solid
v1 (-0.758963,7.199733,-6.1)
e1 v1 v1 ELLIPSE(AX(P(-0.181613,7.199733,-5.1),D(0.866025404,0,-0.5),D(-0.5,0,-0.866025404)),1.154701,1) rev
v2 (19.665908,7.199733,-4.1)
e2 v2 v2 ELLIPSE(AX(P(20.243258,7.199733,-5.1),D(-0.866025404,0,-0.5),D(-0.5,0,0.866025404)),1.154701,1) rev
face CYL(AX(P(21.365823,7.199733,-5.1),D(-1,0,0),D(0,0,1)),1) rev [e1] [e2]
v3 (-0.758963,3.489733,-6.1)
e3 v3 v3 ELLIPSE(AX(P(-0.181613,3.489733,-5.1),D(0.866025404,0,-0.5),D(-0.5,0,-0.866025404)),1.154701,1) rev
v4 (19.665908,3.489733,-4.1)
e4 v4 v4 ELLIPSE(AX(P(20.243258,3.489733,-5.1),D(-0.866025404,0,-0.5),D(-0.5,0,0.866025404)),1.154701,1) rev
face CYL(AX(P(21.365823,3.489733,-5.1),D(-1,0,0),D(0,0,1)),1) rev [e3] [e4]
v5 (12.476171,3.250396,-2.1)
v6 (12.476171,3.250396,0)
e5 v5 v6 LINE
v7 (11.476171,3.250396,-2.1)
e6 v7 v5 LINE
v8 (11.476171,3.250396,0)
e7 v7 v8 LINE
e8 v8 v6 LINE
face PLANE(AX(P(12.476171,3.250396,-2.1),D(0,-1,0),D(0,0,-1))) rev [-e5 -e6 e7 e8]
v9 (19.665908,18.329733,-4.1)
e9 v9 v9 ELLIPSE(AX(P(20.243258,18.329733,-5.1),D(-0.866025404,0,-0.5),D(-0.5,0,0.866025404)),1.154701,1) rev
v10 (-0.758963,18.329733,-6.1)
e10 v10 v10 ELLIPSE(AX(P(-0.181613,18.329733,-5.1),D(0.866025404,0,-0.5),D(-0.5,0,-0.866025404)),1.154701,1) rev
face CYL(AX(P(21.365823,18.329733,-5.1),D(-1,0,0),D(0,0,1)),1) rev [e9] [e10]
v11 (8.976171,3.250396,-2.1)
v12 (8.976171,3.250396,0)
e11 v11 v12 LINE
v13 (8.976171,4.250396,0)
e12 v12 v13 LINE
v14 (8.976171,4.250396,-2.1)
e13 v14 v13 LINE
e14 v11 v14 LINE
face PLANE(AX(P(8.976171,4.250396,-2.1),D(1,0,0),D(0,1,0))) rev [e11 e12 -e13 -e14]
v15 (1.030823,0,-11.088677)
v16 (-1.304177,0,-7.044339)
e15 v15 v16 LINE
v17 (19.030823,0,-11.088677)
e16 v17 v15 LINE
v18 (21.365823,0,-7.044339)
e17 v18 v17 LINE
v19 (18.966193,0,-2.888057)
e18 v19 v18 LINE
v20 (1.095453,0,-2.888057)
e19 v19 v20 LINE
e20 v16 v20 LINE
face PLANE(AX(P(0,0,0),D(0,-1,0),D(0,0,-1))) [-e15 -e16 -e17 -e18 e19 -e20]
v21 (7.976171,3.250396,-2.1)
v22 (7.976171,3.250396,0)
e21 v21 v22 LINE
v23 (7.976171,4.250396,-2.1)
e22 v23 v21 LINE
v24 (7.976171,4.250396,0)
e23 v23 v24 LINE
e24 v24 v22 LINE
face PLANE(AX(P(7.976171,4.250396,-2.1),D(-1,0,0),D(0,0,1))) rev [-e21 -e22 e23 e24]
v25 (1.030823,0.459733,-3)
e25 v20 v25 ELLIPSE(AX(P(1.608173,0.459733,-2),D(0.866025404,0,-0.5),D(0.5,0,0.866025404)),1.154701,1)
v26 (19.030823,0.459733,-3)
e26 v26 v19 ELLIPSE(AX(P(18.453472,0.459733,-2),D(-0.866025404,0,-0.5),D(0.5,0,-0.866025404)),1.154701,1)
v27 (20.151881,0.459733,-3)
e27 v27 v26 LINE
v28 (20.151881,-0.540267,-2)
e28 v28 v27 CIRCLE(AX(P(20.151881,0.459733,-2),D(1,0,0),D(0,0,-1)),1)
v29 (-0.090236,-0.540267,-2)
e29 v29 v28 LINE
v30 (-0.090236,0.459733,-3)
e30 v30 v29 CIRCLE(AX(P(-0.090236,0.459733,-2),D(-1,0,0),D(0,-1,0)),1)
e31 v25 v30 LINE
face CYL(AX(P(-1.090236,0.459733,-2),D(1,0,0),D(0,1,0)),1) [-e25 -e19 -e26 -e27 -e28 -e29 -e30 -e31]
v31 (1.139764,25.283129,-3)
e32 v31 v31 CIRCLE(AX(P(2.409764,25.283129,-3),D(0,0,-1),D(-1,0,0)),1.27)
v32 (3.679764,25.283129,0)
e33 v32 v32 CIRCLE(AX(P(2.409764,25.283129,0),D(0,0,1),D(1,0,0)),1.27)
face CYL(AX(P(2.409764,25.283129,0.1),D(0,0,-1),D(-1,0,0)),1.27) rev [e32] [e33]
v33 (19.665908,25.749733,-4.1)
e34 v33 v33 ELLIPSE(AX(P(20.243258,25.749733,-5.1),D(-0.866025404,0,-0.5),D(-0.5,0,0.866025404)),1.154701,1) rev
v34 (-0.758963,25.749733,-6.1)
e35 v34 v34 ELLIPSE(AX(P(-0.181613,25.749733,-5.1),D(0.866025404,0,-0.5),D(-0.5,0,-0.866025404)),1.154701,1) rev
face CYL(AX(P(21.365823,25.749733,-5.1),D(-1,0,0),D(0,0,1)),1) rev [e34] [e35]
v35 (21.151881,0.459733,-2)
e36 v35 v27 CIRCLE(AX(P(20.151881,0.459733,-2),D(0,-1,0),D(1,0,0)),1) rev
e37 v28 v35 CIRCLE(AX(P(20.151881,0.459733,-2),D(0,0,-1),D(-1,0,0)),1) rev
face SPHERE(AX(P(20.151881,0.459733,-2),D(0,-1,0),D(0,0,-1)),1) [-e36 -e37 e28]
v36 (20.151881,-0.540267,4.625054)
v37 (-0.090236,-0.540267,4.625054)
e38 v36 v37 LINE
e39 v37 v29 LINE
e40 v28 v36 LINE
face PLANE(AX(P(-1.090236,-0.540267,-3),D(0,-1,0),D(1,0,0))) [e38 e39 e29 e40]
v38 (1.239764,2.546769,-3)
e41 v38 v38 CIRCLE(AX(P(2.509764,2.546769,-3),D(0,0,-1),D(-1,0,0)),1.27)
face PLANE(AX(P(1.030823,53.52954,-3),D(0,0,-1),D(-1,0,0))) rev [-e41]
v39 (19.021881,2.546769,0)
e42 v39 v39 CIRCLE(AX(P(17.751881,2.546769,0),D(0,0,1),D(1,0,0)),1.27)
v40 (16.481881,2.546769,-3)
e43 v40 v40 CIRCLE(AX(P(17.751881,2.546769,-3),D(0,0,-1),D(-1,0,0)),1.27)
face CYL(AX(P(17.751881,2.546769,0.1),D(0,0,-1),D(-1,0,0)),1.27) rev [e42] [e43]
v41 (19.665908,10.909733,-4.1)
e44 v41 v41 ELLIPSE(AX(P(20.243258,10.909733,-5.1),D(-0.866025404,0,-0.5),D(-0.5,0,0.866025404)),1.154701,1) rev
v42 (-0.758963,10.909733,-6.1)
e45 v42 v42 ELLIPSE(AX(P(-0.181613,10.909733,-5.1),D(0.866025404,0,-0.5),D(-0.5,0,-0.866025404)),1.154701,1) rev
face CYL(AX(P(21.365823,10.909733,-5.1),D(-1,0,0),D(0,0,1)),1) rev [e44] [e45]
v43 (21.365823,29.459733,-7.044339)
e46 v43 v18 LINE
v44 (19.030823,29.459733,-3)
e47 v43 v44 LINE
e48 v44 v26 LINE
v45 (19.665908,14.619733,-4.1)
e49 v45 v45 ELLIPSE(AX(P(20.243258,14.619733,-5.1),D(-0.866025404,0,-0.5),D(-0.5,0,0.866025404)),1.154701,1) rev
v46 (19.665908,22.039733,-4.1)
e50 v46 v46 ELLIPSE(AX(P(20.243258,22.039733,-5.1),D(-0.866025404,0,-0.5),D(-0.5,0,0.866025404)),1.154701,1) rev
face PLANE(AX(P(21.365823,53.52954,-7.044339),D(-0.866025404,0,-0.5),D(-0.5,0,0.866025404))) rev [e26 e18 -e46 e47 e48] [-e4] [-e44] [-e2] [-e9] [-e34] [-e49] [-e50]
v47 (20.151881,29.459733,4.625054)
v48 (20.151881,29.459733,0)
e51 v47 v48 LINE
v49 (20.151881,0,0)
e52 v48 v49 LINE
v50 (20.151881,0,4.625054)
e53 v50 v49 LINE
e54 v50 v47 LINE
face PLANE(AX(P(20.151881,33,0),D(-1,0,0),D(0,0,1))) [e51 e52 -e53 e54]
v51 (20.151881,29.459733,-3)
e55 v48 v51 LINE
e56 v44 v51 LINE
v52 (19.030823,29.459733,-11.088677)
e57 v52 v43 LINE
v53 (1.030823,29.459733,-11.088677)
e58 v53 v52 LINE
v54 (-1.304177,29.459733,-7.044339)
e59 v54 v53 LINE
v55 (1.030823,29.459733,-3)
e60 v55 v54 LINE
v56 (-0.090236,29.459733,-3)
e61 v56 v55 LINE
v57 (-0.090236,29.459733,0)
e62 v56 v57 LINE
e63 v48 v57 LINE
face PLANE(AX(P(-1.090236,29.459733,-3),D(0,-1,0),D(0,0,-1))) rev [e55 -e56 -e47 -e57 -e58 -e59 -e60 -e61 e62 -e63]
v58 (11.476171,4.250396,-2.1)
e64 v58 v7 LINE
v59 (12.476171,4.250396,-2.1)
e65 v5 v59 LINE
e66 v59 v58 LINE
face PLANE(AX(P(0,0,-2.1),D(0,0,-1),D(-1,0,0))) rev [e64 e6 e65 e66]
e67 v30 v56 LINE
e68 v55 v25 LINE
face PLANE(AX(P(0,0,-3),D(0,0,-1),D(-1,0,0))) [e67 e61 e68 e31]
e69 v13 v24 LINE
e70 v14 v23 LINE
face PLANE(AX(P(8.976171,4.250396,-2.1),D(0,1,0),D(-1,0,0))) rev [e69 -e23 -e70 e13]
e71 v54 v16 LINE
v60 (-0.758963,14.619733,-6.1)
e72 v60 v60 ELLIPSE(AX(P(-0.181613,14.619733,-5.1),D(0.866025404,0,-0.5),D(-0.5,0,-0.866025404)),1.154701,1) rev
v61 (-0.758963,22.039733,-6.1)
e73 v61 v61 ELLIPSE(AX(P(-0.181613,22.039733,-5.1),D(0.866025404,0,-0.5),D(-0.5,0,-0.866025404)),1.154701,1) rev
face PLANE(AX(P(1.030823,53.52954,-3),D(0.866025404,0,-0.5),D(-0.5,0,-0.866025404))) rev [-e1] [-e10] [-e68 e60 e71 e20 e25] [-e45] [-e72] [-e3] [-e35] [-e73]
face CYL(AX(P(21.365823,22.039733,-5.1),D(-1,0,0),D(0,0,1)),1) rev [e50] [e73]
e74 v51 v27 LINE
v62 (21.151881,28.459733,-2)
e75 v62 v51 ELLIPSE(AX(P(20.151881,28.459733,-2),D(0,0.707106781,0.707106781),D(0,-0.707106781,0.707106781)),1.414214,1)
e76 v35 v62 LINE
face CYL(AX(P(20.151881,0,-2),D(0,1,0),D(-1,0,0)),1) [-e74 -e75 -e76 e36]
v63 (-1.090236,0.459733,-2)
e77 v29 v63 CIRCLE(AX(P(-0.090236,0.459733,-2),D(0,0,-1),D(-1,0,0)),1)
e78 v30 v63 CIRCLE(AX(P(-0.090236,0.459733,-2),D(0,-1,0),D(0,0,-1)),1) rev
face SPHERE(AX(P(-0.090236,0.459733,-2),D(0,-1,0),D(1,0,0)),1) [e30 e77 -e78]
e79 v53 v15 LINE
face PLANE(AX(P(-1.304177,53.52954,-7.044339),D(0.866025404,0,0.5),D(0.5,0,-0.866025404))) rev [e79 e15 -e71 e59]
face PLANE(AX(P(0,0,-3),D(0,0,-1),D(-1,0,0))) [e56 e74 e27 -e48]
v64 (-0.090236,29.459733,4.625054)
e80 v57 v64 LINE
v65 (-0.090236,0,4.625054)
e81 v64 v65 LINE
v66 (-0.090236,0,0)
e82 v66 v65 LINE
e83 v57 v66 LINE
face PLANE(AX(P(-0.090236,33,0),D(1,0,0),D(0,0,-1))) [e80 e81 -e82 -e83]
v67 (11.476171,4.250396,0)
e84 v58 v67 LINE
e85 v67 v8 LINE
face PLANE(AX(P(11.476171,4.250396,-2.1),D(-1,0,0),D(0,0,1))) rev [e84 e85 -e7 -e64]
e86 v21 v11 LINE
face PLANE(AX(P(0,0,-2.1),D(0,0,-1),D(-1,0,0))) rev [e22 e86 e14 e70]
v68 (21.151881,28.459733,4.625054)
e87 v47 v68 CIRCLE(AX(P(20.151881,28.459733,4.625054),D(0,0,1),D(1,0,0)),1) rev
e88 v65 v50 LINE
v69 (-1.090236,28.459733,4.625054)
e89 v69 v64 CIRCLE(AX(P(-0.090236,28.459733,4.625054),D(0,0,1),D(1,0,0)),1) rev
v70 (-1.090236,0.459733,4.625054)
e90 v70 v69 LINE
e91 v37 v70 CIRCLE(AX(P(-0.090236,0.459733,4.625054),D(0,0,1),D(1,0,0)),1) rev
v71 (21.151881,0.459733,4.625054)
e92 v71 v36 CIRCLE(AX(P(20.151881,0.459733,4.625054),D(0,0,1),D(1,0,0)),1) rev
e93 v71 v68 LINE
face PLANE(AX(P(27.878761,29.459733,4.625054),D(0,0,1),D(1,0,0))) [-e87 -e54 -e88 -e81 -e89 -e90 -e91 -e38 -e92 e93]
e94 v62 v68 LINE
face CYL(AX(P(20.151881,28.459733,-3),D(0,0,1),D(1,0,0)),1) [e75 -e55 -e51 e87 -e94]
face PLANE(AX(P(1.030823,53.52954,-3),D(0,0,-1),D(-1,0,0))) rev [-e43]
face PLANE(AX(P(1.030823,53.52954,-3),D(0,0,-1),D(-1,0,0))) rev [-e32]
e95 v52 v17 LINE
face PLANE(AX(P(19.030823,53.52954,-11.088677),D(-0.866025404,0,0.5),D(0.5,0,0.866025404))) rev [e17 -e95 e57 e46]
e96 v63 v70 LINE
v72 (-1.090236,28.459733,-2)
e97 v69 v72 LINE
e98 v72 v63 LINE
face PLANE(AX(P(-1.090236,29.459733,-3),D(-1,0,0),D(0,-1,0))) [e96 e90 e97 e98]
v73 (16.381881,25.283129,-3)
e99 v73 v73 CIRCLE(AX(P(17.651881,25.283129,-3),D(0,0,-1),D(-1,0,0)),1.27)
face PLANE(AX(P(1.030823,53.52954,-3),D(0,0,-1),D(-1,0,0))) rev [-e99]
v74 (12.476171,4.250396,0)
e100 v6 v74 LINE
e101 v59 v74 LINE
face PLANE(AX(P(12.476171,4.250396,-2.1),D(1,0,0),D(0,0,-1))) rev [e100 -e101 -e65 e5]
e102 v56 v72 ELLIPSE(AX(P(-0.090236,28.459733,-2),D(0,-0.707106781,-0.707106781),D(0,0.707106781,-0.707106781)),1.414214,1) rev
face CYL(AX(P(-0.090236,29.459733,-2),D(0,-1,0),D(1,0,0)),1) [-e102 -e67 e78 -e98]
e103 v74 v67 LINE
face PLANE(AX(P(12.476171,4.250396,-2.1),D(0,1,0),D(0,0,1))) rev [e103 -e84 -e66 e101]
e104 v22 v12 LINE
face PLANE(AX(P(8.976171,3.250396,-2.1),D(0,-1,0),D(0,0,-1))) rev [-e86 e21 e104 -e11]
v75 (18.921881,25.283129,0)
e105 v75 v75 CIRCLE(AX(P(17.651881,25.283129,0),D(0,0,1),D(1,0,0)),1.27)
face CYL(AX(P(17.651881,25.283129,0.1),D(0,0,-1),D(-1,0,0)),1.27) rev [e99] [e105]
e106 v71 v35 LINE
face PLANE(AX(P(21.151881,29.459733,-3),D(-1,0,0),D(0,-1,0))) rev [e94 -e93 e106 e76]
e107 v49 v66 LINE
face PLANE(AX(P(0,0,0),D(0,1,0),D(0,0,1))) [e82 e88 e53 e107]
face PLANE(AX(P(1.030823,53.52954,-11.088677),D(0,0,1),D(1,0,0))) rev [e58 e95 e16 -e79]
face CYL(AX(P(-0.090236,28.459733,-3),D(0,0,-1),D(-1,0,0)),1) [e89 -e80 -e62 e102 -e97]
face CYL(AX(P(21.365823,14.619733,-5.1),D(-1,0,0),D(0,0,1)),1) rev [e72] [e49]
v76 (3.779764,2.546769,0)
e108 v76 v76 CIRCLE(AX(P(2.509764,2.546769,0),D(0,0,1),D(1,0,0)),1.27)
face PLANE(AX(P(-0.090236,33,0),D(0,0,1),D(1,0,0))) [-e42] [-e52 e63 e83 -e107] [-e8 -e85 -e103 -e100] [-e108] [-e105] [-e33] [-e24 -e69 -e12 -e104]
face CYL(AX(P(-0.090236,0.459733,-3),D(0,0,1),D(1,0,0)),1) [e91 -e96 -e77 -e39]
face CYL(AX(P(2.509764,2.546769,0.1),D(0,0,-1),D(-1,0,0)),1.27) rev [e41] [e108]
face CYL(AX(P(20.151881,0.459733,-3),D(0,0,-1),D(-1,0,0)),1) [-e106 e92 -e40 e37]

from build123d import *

# Parameters (mm, degrees)
BOSS_EXTRUDE1_DEPTH      = 13
BOSS_EXTRUDE1_DEPTH_BACK = 3
SKETCH1_W                = 22.242116592
SKETCH1_H                = 30
SKETCH4_W                = 20.242116592
SKETCH4_H                = 12
CUT_EXTRUDE1_DEPTH       = 33
SKETCH3_W                = 1
SKETCH3_H                = 1
CUT_EXTRUDE2_DEPTH       = 2.1
SKETCH6_R                = 1.27
CUT_EXTRUDE3_DEPTH       = 3.1
BOSS_EXTRUDE3_DEPTH      = 29.459732878
SKETCH8_R                = 1
CUT_EXTRUDE4_DEPTH       = 39.644200609
LPATTERN1_COUNT          = 7
LPATTERN1_PITCH          = 3.71
FILLET2_R                = 1
OPTIONALCUT_DEPTH        = 39.644200609
OPTIONALCUT_DEPTH_BACK   = 39.644200609
SKETCH9_W                = 34.001532977
SKETCH9_H                = 12.141543576


with BuildPart() as part:
    # Sketch1 → Boss-Extrude1 (new, two sides: drawn at the far end of the back side and taken through both)
    with BuildSketch(Plane.XY.offset(-BOSS_EXTRUDE1_DEPTH_BACK)):
        with Locations((10.030822696, 14.459732878)):
            Rectangle(SKETCH1_W, SKETCH1_H)
    extrude(amount=BOSS_EXTRUDE1_DEPTH + BOSS_EXTRUDE1_DEPTH_BACK)

    # Sketch4 → Cut-Extrude1 (cut)
    with BuildSketch(Plane(origin=(0, 0, 0), x_dir=(1, 0, 0), z_dir=(0, 1, 0))):
        with Locations((10.030822696, -6)):
            Rectangle(SKETCH4_W, SKETCH4_H)
    extrude(amount=CUT_EXTRUDE1_DEPTH, mode=Mode.SUBTRACT)

    # Sketch3 → Cut-Extrude2 (cut)
    with BuildSketch(Plane.XY):
        with Locations((11.976170858, 3.750395558)):
            Rectangle(SKETCH3_W, SKETCH3_H)
        with Locations((8.476170858, 3.750395558)):
            Rectangle(SKETCH3_W, SKETCH3_H)
    extrude(amount=-CUT_EXTRUDE2_DEPTH, mode=Mode.SUBTRACT)

    # Sketch6 → Cut-Extrude3 (cut)
    with BuildSketch(Plane(origin=(0, 0, -3), x_dir=(-1, 0, 0), z_dir=(0, 0, -1))):
        with Locations((-17.651880992, 25.283129292)):
            Circle(SKETCH6_R)
        with Locations((-2.4097644, 25.283129292)):
            Circle(SKETCH6_R)
        with Locations((-17.751880992, 2.54676855)):
            Circle(SKETCH6_R)
        with Locations((-2.5097644, 2.54676855)):
            Circle(SKETCH6_R)
    extrude(amount=-CUT_EXTRUDE3_DEPTH, mode=Mode.SUBTRACT)

    # Sketch7 → Boss-Extrude3 (add)
    with BuildSketch(Plane(origin=(0, 0, 0), x_dir=(1, 0, 0), z_dir=(0, 1, 0))):
        Polygon((1.030822696, 3), (19.030822696, 3), (21.365822696, 7.044338636), (19.030822696, 11.088677271), (1.030822696, 11.088677271), (-1.304177304, 7.044338636), align=None)
    extrude(amount=BOSS_EXTRUDE3_DEPTH)

    # Sketch8 → Cut-Extrude4 (cut, symmetric)
    with BuildSketch(Plane(origin=(0, 0, 0), x_dir=(0, 0, -1), z_dir=(1, 0, 0))):
        with Locations(Location((5.1, 25.749732878, 0), (0, 0, 180))):
            Circle(SKETCH8_R)
    cut_extrude4 = extrude(amount=CUT_EXTRUDE4_DEPTH, both=True, mode=Mode.SUBTRACT)

    # LPattern1: Cut-Extrude4 ×7
    with Locations(*[(0, -i * LPATTERN1_PITCH, 0) for i in range(1, LPATTERN1_COUNT)]):
        add(cut_extrude4, mode=Mode.SUBTRACT)

    # Fillet2
    # the kernel refuses this fillet: 1 mm, written as the material it takes off along each edge
    with BuildSketch(Plane(origin=(20.151880992, 0.459732878, -2), x_dir=(0, 0, -1), z_dir=(1, 0, 0))) as fillet2_piece_1_section:
        Polygon((0, 0), (FILLET2_R * 1.02, 0), (FILLET2_R * 1.02, -FILLET2_R * 1.02), (0, -FILLET2_R * 1.02), align=None)
    fillet2_piece_1 = extrude(amount=FILLET2_R * 1.02, mode=Mode.PRIVATE)
    fillet2_piece_1 = fillet2_piece_1 - Plane(origin=(20.151880992, 0.459732878, -2), x_dir=(0, 0.7071067811865475, 0.7071067811865475), z_dir=(1, 0, 0)) * Sphere(FILLET2_R, mode=Mode.PRIVATE)
    add(fillet2_piece_1, mode=Mode.SUBTRACT)
    with BuildSketch(Plane(origin=(-0.0902356, 0.459732878, -2), x_dir=(0, 0, -1), z_dir=(-1, 0, 0))) as fillet2_piece_2_section:
        Polygon((0, 0), (FILLET2_R * 1.02, 0), (FILLET2_R * 1.02, FILLET2_R * 1.02), (0, FILLET2_R * 1.02), align=None)
    fillet2_piece_2 = extrude(amount=FILLET2_R * 1.02, mode=Mode.PRIVATE)
    fillet2_piece_2 = fillet2_piece_2 - Plane(origin=(-0.0902356, 0.459732878, -2), x_dir=(0, 0.7071067811865475, 0.7071067811865475), z_dir=(-1, 0, 0)) * Sphere(FILLET2_R, mode=Mode.PRIVATE)
    add(fillet2_piece_2, mode=Mode.SUBTRACT)
    with BuildSketch(Plane(origin=(20.151880992, 0.459732878, 12), x_dir=(1, 0, 0), z_dir=(0, 0, 1))) as fillet2_piece_3_section:
        Polygon((0, 0), (FILLET2_R * 1.02, 0), (FILLET2_R * 1.02, -FILLET2_R * 1.02), (0, -FILLET2_R * 1.02), align=None)
    fillet2_piece_3 = extrude(amount=FILLET2_R * 1.02, mode=Mode.PRIVATE)
    fillet2_piece_3 = fillet2_piece_3 - Plane(origin=(20.151880992, 0.459732878, 12), x_dir=(-0.7071067811865476, 0.7071067811865475, 0), z_dir=(0, 0, 1)) * Sphere(FILLET2_R, mode=Mode.PRIVATE)
    add(fillet2_piece_3, mode=Mode.SUBTRACT)
    with BuildSketch(Plane(origin=(-0.0902356, 0.459732878, 12), x_dir=(0, -1, 0), z_dir=(0, 0, 1))) as fillet2_piece_4_section:
        Polygon((0, 0), (FILLET2_R * 1.02, 0), (FILLET2_R * 1.02, -FILLET2_R * 1.02), (0, -FILLET2_R * 1.02), align=None)
    fillet2_piece_4 = extrude(amount=FILLET2_R * 1.02, mode=Mode.PRIVATE)
    fillet2_piece_4 = fillet2_piece_4 - Plane(origin=(-0.0902356, 0.459732878, 12), x_dir=(0.7071067811865475, 0.7071067811865477, 0), z_dir=(0, 0, 1)) * Sphere(FILLET2_R, mode=Mode.PRIVATE)
    add(fillet2_piece_4, mode=Mode.SUBTRACT)
    with BuildSketch(Plane(origin=(-0.0902356, 28.459732878, 12), x_dir=(-1, 0, 0), z_dir=(0, 1, 0))) as fillet2_piece_5_section:
        Polygon((0, 0), (FILLET2_R * 1.02, 0), (FILLET2_R * 1.02, FILLET2_R * 1.02), (0, FILLET2_R * 1.02), align=None)
    fillet2_piece_5 = extrude(amount=FILLET2_R * 1.02, mode=Mode.PRIVATE)
    fillet2_piece_5 = fillet2_piece_5 - Plane(origin=(-0.0902356, 28.459732878, 12), x_dir=(0.7071067811865475, 0, -0.7071067811865475), z_dir=(0, 1, 0)) * Sphere(FILLET2_R, mode=Mode.PRIVATE)
    add(fillet2_piece_5, mode=Mode.SUBTRACT)
    with BuildSketch(Plane(origin=(20.151880992, 28.459732878, 12), x_dir=(0, 0, 1), z_dir=(0, 1, 0))) as fillet2_piece_6_section:
        Polygon((0, 0), (FILLET2_R * 1.02, 0), (FILLET2_R * 1.02, FILLET2_R * 1.02), (0, FILLET2_R * 1.02), align=None)
    fillet2_piece_6 = extrude(amount=FILLET2_R * 1.02, mode=Mode.PRIVATE)
    fillet2_piece_6 = fillet2_piece_6 - Plane(origin=(20.151880992, 28.459732878, 12), x_dir=(-0.7071067811865475, 0, -0.7071067811865475), z_dir=(0, 1, 0)) * Sphere(FILLET2_R, mode=Mode.PRIVATE)
    add(fillet2_piece_6, mode=Mode.SUBTRACT)
    with BuildSketch(Plane(origin=(20.151880992, -0.540267122, -3), x_dir=(0, 1, 0), z_dir=(-1, 0, 0))) as fillet2_piece_7_section:
        with BuildLine():
            CenterArc((FILLET2_R, -FILLET2_R), FILLET2_R, 90, 90)
            Line((0, -FILLET2_R), (0, 0))
            Line((0, 0), (FILLET2_R, 0))
        make_face()
    fillet2_piece_7 = extrude(amount=20.242116592, mode=Mode.PRIVATE)
    fillet2_piece_7 = split(fillet2_piece_7, bisect_by=Plane(origin=(19.153997777, 0.112957923, -3.213345499), z_dir=(0.8660254037844363, 0, 0.5000000000000041)), keep=Keep.TOP, mode=Mode.PRIVATE)
    add(fillet2_piece_7, mode=Mode.SUBTRACT)
    with BuildSketch(Plane(origin=(20.151880992, -0.540267122, -3), x_dir=(0, 1, 0), z_dir=(-1, 0, 0))) as fillet2_piece_8_section:
        with BuildLine():
            CenterArc((FILLET2_R, -FILLET2_R), FILLET2_R, 90, 90)
            Line((0, -FILLET2_R), (0, 0))
            Line((0, 0), (FILLET2_R, 0))
        make_face()
    fillet2_piece_8 = extrude(amount=20.242116592, mode=Mode.PRIVATE)
    fillet2_piece_8 = split(fillet2_piece_8, bisect_by=Plane(origin=(10.030822696, 0, -2.762798919), z_dir=(0, -1, 0)), keep=Keep.TOP, mode=Mode.PRIVATE)
    add(fillet2_piece_8, mode=Mode.SUBTRACT)
    with BuildSketch(Plane(origin=(20.151880992, -0.540267122, -3), x_dir=(0, 1, 0), z_dir=(-1, 0, 0))) as fillet2_piece_9_section:
        with BuildLine():
            CenterArc((FILLET2_R, -FILLET2_R), FILLET2_R, 90, 90)
            Line((0, -FILLET2_R), (0, 0))
            Line((0, 0), (FILLET2_R, 0))
        make_face()
    fillet2_piece_9 = extrude(amount=20.242116592, mode=Mode.PRIVATE)
    fillet2_piece_9 = split(fillet2_piece_9, bisect_by=Plane(origin=(0.907647615, 0.112957923, -3.213345499), z_dir=(-0.8660254037844362, 0, 0.5000000000000044)), keep=Keep.TOP, mode=Mode.PRIVATE)
    add(fillet2_piece_9, mode=Mode.SUBTRACT)
    with BuildSketch(Plane(origin=(20.151880992, -0.540267122, 13), x_dir=(0, 1, 0), z_dir=(-1, 0, 0))) as fillet2_piece_10:
        with BuildLine():
            CenterArc((FILLET2_R, FILLET2_R), FILLET2_R, 180, 90)
            Line((0, FILLET2_R), (0, 0))
            Line((0, 0), (FILLET2_R, 0))
        make_face()
    extrude(amount=20.242116592, mode=Mode.SUBTRACT)
    with BuildSketch(Plane(origin=(-1.0902356, 0.459732878, -3), x_dir=(1, 0, 0), z_dir=(0, 1, 0))) as fillet2_piece_11:
        with BuildLine():
            CenterArc((FILLET2_R, -FILLET2_R), FILLET2_R, 90, 90)
            Line((0, -FILLET2_R), (0, 0))
            Line((0, 0), (FILLET2_R, 0))
        make_face()
    extrude(amount=31.5, mode=Mode.SUBTRACT)
    with BuildSketch(Plane(origin=(-1.0902356, 29.459732878, -5.5), x_dir=(1, 0, 0), z_dir=(0, 0, 1))) as fillet2_piece_12_section:
        with BuildLine():
            CenterArc((FILLET2_R, -FILLET2_R), FILLET2_R, 90, 90)
            Line((0, -FILLET2_R), (0, 0))
            Line((0, 0), (FILLET2_R, 0))
        make_face()
    fillet2_piece_12 = extrude(amount=17.5, mode=Mode.PRIVATE)
    fillet2_piece_12 = split(fillet2_piece_12, bisect_by=Plane(origin=(1.20591916, 29.236364939, -2.696724029), z_dir=(-0.8660254037844362, 0, 0.5000000000000044)), keep=Keep.TOP, mode=Mode.PRIVATE)
    add(fillet2_piece_12, mode=Mode.SUBTRACT)
    with BuildSketch(Plane(origin=(-1.0902356, 0.459732878, 13), x_dir=(1, 0, 0), z_dir=(0, 1, 0)), Plane(origin=(21.151880992, 28.459732878, 13), x_dir=(-1, 0, 0), z_dir=(0, -1, 0))) as fillet2_piece_13:
        with BuildLine():
            CenterArc((FILLET2_R, FILLET2_R), FILLET2_R, 180, 90)
            Line((0, FILLET2_R), (0, 0))
            Line((0, 0), (FILLET2_R, 0))
        make_face()
    extrude(amount=28, mode=Mode.SUBTRACT)
    with BuildSketch(Plane(origin=(-1.0902356, -0.540267122, -2), x_dir=(0, 1, 0), z_dir=(0, 0, 1)), Plane(origin=(21.151880992, -0.540267122, 12), x_dir=(0, 1, 0), z_dir=(0, 0, -1))) as fillet2_piece_14:
        with BuildLine():
            CenterArc((FILLET2_R, -FILLET2_R), FILLET2_R, 90, 90)
            Line((0, -FILLET2_R), (0, 0))
            Line((0, 0), (FILLET2_R, 0))
        make_face()
    extrude(amount=14, mode=Mode.SUBTRACT)
    with BuildSketch(Plane(origin=(21.151880992, 31.959732878, -3), x_dir=(0, 0, 1), z_dir=(0, -1, 0))) as fillet2_piece_15:
        with BuildLine():
            CenterArc((FILLET2_R, FILLET2_R), FILLET2_R, 180, 90)
            Line((0, FILLET2_R), (0, 0))
            Line((0, 0), (FILLET2_R, 0))
        make_face()
    extrude(amount=31.5, mode=Mode.SUBTRACT)
    with BuildSketch(Plane(origin=(21.151880992, 29.459732878, 12), x_dir=(-1, 0, 0), z_dir=(0, 0, -1))) as fillet2_piece_16_section:
        with BuildLine():
            CenterArc((FILLET2_R, -FILLET2_R), FILLET2_R, 90, 90)
            Line((0, -FILLET2_R), (0, 0))
            Line((0, 0), (FILLET2_R, 0))
        make_face()
    fillet2_piece_16 = extrude(amount=17.5, mode=Mode.PRIVATE)
    fillet2_piece_16 = split(fillet2_piece_16, bisect_by=Plane(origin=(15.608130968, 29.236364939, 2.928275971), z_dir=(0.8660254037844363, 0, 0.5000000000000041)), keep=Keep.TOP, mode=Mode.PRIVATE)
    add(fillet2_piece_16, mode=Mode.SUBTRACT)
    with BuildSketch(Plane(origin=(-0.0902356, 29.459732878, 13), x_dir=(0, 0, -1), z_dir=(1, 0, 0))) as fillet2_piece_17:
        with BuildLine():
            CenterArc((FILLET2_R, -FILLET2_R), FILLET2_R, 90, 90)
            Line((0, -FILLET2_R), (0, 0))
            Line((0, 0), (FILLET2_R, 0))
        make_face()
    extrude(amount=20.242116592, mode=Mode.SUBTRACT)

    # Sketch9 → OptionalCut (cut, two sides: drawn at the far end of the back side and taken through both)
    with BuildSketch(Plane(origin=(0, 0, 0), x_dir=(1, 0, 0), z_dir=(0, 1, 0)).offset(-OPTIONALCUT_DEPTH_BACK)):
        with Locations((10.877994957, -10.695825978)):
            Rectangle(SKETCH9_W, SKETCH9_H)
    extrude(amount=OPTIONALCUT_DEPTH + OPTIONALCUT_DEPTH_BACK, mode=Mode.SUBTRACT)


solid = part.part
